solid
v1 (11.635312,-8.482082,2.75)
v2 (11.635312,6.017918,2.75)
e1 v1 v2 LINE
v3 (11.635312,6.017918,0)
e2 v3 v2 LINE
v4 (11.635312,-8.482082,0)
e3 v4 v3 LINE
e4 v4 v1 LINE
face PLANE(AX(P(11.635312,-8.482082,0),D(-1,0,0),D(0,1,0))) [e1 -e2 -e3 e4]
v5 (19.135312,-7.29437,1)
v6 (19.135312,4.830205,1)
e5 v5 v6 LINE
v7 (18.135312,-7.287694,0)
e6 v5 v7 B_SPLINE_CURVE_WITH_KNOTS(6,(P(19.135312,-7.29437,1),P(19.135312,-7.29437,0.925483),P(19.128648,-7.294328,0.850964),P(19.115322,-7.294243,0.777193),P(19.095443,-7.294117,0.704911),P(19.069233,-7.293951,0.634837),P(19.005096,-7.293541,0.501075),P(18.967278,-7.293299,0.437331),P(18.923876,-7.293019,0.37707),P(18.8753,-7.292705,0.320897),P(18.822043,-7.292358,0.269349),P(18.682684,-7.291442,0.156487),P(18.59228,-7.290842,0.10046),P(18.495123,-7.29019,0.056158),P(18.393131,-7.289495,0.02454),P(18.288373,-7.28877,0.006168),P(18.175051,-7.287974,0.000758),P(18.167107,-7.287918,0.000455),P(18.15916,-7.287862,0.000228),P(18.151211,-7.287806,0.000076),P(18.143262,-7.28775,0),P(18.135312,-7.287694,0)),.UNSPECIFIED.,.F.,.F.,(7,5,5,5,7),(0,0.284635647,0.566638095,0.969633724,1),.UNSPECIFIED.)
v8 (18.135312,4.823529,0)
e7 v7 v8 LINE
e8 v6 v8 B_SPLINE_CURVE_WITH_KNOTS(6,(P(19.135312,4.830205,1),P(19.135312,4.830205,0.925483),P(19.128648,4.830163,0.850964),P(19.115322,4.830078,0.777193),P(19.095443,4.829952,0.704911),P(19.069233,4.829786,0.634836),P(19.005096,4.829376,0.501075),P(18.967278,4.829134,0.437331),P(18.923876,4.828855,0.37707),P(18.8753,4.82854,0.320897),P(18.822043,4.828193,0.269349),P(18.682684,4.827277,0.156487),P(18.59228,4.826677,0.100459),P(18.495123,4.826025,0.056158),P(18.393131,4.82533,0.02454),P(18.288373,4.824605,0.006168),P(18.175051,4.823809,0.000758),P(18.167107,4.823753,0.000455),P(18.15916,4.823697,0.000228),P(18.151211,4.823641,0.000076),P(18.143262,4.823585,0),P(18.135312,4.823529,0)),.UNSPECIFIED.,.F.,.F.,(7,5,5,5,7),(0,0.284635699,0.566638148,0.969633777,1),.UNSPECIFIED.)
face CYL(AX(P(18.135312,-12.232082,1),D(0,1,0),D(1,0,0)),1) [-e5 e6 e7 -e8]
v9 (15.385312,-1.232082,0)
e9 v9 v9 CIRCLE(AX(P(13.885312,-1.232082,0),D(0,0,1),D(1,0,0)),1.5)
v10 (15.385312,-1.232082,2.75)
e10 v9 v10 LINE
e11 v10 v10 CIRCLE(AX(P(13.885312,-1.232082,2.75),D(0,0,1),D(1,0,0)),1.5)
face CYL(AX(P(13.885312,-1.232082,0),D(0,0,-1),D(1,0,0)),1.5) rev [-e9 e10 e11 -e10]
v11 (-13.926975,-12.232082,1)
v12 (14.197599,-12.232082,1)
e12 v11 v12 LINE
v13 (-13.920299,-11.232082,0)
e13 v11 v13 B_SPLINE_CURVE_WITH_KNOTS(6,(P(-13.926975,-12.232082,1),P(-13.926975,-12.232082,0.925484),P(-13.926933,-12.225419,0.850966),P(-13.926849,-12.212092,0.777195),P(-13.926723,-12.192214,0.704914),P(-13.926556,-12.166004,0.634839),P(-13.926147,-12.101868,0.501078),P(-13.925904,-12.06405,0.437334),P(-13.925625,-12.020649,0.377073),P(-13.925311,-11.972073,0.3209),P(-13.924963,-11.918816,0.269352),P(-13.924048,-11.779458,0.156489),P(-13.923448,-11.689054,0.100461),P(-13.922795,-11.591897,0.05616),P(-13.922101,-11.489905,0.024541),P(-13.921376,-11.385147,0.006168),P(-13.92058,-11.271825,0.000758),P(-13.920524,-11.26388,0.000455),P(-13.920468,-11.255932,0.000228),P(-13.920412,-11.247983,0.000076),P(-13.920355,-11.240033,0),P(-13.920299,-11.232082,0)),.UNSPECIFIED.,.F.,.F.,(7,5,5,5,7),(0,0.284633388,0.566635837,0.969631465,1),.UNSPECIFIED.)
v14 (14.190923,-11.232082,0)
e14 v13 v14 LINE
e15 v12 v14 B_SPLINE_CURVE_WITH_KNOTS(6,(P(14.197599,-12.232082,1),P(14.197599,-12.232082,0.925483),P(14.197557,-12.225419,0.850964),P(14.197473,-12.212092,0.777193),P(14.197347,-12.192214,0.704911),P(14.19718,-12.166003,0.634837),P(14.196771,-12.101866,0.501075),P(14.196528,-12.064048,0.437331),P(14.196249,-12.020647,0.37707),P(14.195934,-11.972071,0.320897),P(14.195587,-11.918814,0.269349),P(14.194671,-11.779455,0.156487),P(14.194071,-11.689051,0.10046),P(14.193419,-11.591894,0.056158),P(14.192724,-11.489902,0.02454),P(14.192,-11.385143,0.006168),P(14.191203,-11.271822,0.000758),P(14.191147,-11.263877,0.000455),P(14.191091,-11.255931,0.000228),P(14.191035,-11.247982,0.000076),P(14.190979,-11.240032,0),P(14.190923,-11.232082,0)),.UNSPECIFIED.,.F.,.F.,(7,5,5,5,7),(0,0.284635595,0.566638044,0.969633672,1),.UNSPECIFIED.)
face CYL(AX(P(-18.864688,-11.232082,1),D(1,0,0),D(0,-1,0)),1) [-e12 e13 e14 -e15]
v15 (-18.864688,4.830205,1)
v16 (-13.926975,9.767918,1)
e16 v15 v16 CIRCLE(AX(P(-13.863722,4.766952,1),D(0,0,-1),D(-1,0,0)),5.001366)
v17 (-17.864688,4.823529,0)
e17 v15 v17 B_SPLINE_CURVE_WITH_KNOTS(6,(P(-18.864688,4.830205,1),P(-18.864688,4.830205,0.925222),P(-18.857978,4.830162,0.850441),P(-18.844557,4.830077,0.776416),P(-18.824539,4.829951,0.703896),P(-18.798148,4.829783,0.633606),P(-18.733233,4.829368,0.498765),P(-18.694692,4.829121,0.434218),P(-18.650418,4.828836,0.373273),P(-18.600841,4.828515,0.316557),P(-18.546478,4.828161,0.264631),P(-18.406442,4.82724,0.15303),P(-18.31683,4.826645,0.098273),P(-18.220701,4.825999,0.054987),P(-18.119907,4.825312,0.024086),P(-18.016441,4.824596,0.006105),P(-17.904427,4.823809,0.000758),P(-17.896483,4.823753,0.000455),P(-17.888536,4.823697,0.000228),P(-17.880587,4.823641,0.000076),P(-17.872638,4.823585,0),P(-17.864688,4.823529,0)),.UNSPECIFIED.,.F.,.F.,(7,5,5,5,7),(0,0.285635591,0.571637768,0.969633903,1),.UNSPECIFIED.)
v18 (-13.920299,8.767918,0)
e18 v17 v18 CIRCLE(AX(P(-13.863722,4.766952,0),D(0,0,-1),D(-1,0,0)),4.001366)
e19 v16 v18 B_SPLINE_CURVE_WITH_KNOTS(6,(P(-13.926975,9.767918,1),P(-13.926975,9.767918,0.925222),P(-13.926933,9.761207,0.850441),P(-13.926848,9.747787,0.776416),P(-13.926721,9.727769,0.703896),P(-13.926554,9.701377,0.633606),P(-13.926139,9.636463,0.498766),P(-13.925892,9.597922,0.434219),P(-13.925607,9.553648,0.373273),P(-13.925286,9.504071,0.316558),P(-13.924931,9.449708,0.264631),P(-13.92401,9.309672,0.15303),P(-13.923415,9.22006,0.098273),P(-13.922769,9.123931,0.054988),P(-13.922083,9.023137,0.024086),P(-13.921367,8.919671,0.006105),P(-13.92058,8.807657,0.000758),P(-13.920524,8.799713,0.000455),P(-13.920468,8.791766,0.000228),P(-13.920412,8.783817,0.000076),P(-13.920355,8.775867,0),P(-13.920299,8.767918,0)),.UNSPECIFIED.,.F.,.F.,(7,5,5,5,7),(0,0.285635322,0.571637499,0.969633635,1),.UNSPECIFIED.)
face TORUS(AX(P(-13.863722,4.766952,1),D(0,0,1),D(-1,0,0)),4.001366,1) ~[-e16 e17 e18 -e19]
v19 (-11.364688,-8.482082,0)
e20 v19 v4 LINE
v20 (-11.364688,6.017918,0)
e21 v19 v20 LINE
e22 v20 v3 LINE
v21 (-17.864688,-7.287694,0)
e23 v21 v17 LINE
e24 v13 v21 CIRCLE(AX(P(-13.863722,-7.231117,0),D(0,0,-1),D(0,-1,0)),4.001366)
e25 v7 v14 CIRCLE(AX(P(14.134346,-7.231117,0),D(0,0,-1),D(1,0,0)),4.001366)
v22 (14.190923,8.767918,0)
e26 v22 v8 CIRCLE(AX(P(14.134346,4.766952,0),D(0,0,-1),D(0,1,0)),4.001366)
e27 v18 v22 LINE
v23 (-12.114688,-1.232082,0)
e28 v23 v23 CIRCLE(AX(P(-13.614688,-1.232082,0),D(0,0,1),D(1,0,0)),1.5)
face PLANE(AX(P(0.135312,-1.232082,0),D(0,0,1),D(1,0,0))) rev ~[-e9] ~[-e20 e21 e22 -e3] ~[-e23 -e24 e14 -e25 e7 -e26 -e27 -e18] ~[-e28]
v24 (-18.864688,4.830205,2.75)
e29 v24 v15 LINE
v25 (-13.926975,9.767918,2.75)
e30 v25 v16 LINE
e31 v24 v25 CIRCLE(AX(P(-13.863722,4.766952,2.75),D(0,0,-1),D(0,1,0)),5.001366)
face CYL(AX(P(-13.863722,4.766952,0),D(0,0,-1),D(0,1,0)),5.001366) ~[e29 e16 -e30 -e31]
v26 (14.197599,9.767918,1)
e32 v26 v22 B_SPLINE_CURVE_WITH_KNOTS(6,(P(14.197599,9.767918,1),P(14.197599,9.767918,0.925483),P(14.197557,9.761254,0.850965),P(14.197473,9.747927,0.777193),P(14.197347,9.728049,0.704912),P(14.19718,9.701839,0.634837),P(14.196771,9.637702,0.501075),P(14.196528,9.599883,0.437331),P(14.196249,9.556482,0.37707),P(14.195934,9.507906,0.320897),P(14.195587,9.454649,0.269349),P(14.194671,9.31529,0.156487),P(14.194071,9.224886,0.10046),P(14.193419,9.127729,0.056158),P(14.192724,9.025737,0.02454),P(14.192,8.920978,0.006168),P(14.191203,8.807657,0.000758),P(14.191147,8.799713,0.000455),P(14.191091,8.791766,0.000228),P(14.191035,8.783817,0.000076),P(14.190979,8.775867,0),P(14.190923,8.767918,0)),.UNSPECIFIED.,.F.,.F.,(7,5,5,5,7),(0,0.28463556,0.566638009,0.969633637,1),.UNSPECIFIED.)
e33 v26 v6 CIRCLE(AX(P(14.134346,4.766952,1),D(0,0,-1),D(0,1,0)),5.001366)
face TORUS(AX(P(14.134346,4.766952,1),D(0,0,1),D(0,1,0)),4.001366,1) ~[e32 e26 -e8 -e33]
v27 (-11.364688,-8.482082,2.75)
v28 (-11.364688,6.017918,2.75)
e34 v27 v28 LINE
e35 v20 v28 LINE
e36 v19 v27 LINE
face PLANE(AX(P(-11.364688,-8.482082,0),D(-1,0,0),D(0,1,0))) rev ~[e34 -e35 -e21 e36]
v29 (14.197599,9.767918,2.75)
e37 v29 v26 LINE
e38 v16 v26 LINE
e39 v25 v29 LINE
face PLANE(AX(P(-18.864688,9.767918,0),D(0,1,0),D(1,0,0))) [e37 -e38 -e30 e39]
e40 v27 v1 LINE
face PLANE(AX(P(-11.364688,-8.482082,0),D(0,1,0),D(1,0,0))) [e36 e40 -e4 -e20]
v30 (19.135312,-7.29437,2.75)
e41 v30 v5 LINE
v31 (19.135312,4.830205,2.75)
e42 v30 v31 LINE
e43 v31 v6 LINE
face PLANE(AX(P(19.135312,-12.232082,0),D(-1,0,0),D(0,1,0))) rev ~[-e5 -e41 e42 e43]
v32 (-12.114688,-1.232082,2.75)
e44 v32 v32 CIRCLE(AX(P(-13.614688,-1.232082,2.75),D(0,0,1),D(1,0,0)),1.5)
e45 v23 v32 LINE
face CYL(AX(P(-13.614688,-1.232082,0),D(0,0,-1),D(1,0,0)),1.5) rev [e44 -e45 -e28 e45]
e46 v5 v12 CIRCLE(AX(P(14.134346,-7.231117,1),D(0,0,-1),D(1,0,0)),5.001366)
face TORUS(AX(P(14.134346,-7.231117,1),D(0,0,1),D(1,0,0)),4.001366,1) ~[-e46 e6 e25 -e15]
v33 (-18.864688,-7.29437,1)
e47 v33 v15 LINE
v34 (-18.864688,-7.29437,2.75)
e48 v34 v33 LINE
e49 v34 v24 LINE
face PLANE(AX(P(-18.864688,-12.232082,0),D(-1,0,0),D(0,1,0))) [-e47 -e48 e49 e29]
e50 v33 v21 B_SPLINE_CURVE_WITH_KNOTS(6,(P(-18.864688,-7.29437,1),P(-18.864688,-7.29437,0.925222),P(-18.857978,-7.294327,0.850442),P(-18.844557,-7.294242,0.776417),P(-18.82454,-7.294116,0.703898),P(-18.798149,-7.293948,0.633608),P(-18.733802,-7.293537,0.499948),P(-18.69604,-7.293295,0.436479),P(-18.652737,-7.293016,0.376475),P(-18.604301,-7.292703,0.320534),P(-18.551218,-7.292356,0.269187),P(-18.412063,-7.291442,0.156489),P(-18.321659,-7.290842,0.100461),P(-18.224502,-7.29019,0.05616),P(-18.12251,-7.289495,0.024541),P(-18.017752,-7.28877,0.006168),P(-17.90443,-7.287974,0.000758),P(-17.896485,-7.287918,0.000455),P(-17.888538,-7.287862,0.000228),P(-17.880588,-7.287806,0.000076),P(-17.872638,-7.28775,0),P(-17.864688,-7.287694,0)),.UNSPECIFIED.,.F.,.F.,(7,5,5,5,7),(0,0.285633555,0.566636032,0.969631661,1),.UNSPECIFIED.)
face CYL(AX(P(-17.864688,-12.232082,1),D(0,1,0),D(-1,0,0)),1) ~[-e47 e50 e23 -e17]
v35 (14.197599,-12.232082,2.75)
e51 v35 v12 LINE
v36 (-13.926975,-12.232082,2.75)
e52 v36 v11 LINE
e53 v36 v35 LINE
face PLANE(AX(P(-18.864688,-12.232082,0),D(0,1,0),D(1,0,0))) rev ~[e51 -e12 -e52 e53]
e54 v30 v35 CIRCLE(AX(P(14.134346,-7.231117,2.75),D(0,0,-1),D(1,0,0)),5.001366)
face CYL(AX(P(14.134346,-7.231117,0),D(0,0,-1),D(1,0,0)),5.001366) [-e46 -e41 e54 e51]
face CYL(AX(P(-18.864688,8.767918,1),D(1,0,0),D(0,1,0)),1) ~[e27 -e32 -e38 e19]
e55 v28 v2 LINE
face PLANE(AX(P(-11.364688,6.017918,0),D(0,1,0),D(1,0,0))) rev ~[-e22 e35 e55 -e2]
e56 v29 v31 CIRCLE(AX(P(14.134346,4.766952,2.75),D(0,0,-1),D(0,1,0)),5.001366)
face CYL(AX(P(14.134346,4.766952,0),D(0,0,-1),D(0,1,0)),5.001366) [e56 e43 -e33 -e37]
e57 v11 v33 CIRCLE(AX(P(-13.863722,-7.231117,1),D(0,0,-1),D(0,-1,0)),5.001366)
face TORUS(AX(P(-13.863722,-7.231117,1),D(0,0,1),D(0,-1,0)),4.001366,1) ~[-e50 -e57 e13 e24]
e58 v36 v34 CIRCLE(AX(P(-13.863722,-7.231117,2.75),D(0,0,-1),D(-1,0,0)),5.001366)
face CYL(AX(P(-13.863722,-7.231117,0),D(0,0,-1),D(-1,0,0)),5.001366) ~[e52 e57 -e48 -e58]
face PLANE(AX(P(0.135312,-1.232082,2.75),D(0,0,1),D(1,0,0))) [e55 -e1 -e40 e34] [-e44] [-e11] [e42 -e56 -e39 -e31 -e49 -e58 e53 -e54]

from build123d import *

# Parameters (mm, degrees)
F0_W         = 38
F0_H         = 22
F0_R         = 1.5
F0_W_2       = 23
F0_H_2       = 14.5
F1_DEPTH     = 2.75
F2_R         = 1
F3_T3_ANGLE  = 90
F3_T6_ANGLE  = 90
F3_T9_ANGLE  = 90
F3_T12_ANGLE = 90
F3_T15_DEPTH = 15.2524142536
F3_T18_DEPTH = 15.2524142536
F3_T21_DEPTH = 15.2524142536
F3_T24_DEPTH = 15.2524142536


# Not quite as in the source:
# - a fillet or chamfer that OpenCascade refuses, or shapes differently, is made with other operations: its cross-section is extruded or revolved along the edge and cut away or added


with BuildPart() as f1:
    # F0 (on Top) → F1 (new body)
    with BuildSketch(Plane.XY):
        with Locations((0.1353118792, -1.2320824713)):
            Rectangle(F0_W, F0_H)
        with Locations((-13.6146881208, -1.2320824713)):
            Circle(F0_R, mode=Mode.SUBTRACT)
        with Locations((0.1353118792, -1.2320824713)):
            Rectangle(F0_W_2, F0_H_2, mode=Mode.SUBTRACT)
        with Locations((13.8853118792, -1.2320824713)):
            Circle(F0_R, mode=Mode.SUBTRACT)
    extrude(amount=F1_DEPTH)

    # F2
    f2_edges = [f1.edges().sort_by_distance(p)[0] for p in [
        (19.135312, -1.232082, 0),
        (0.135312, 9.767918, 0),
        (-18.864688, -1.232082, 0),
        (0.135312, -12.232082, 0),
    ]]
    fillet(f2_edges, radius=F2_R)

    # F3: fillet of radius 5 on 4 edges, made by hand


with BuildPart() as f3_tool1:
    # F3_s2 → F3_t3 (revolve)
    with BuildSketch(Plane.XZ.offset(-4.7669518433)):
        with BuildLine():
            ThreePointArc((-17.8650881208, 0), (-18.572194902, 0.2928932188), (-18.8650881208, 1))
            Line((-18.8650881208, 1), (-18.8650881208, 0))
            Line((-18.8650881208, 0), (-17.8650881208, 0))
        make_face()
    revolve(axis=Axis((-13.8637224354, 4.7669518433, 0), (0, 0, -1)), revolution_arc=F3_T3_ANGLE)


with BuildPart() as f3_tool4:
    # F3_s5 → F3_t6 (revolve)
    with BuildSketch(Plane.YZ.offset(-13.8637224354)):
        with BuildLine():
            ThreePointArc((-11.2324824713, 0), (-11.9395892524, 0.2928932188), (-12.2324824713, 1))
            Line((-12.2324824713, 1), (-12.2324824713, 0))
            Line((-12.2324824713, 0), (-11.2324824713, 0))
        make_face()
    revolve(axis=Axis((-13.8637224354, -7.2311167858, 0), (0, 0, -1)), revolution_arc=F3_T6_ANGLE)


with BuildPart() as f3_tool7:
    # F3_s8 → F3_t9 (revolve)
    with BuildSketch(Plane.XZ.offset(7.2311167858)):
        with BuildLine():
            ThreePointArc((18.1357118792, 0), (18.8428186604, 0.2928932188), (19.1357118792, 1))
            Line((19.1357118792, 1), (19.1357118792, 0))
            Line((19.1357118792, 0), (18.1357118792, 0))
        make_face()
    revolve(axis=Axis((14.1343461938, -7.2311167858, 0), (0, 0, -1)), revolution_arc=F3_T9_ANGLE)


with BuildPart() as f3_tool10:
    # F3_s11 → F3_t12 (revolve)
    with BuildSketch(Plane.YZ.offset(14.1343461938)):
        with BuildLine():
            ThreePointArc((8.7683175287, 0), (9.4754243099, 0.2928932188), (9.7683175287, 1))
            Line((9.7683175287, 1), (9.7683175287, 0))
            Line((9.7683175287, 0), (8.7683175287, 0))
        make_face()
    revolve(axis=Axis((14.1343461938, 4.7669518433, 0), (0, 0, -1)), revolution_arc=F3_T12_ANGLE)


with BuildPart() as f3_tool13:
    # F3_s14 → F3_t15 (new body)
    with BuildSketch(Plane.XY):
        with BuildLine():
            ThreePointArc((14.1343461938, 9.7683175287), (17.6708457852, 8.3034514347), (19.1357118792, 4.7669518433))
            Line((19.1357118792, 4.7669518433), (19.6358484478, 4.7669518433))
            ThreePointArc((19.6358484478, 4.7669518433), (19.6354484478, 7.267434686), (19.6354484478, 9.7679175287))
            Line((19.6354484478, 9.7679175287), (19.1353118792, 10.2680540973))
            ThreePointArc((19.1353118792, 10.2680540973), (16.6348290365, 10.2680540973), (14.1343461938, 10.2684540973))
            Line((14.1343461938, 10.2684540973), (14.1343461938, 9.7683175287))
        make_face()
    extrude(amount=F3_T15_DEPTH)


with BuildPart() as f3_tool16:
    # F3_s17 → F3_t18 (new body)
    with BuildSketch(Plane.XY):
        with BuildLine():
            ThreePointArc((19.1357118792, -7.2311167858), (17.6708457852, -10.7676163772), (14.1343461938, -12.2324824713))
            Line((14.1343461938, -12.2324824713), (14.1343461938, -12.7326190398))
            ThreePointArc((14.1343461938, -12.7326190398), (16.6348290365, -12.7322190398), (19.1353118792, -12.7322190398))
            Line((19.1353118792, -12.7322190398), (19.6354484478, -12.2320824713))
            ThreePointArc((19.6354484478, -12.2320824713), (19.6354484478, -9.7315996285), (19.6358484478, -7.2311167858))
            Line((19.6358484478, -7.2311167858), (19.1357118792, -7.2311167858))
        make_face()
    extrude(amount=F3_T18_DEPTH)


with BuildPart() as f3_tool19:
    # F3_s20 → F3_t21 (new body)
    with BuildSketch(Plane.XY):
        with BuildLine():
            ThreePointArc((-18.8650881208, -7.2311167858), (-17.4002220267, -10.7676163772), (-13.8637224354, -12.2324824713))
            Line((-13.8637224354, -12.2324824713), (-13.8637224354, -12.7326190398))
            ThreePointArc((-13.8637224354, -12.7326190398), (-16.3642052781, -12.7322190398), (-18.8646881208, -12.7322190398))
            Line((-18.8646881208, -12.7322190398), (-19.3648246893, -12.2320824713))
            ThreePointArc((-19.3648246893, -12.2320824713), (-19.3648246893, -9.7315996285), (-19.3652246893, -7.2311167858))
            Line((-19.3652246893, -7.2311167858), (-18.8650881208, -7.2311167858))
        make_face()
    extrude(amount=F3_T21_DEPTH)


with BuildPart() as f3_tool22:
    # F3_s23 → F3_t24 (new body)
    with BuildSketch(Plane.XY):
        with BuildLine():
            ThreePointArc((-13.8637224354, 9.7683175287), (-17.4002220267, 8.3034514347), (-18.8650881208, 4.7669518433))
            Line((-18.8650881208, 4.7669518433), (-19.3652246893, 4.7669518433))
            ThreePointArc((-19.3652246893, 4.7669518433), (-19.3648246893, 7.267434686), (-19.3648246893, 9.7679175287))
            Line((-19.3648246893, 9.7679175287), (-18.8646881208, 10.2680540973))
            ThreePointArc((-18.8646881208, 10.2680540973), (-16.3642052781, 10.2680540973), (-13.8637224354, 10.2684540973))
            Line((-13.8637224354, 10.2684540973), (-13.8637224354, 9.7683175287))
        make_face()
    extrude(amount=F3_T24_DEPTH)


with BuildPart() as f1_1:
    add(f1.part)

    # F3_t25: cut F3_tool1, F3_tool4, F3_tool7, F3_tool10, F3_tool13, F3_tool16, F3_tool19, F3_tool22
    add([f3_tool1.part, f3_tool4.part, f3_tool7.part, f3_tool10.part, f3_tool13.part, f3_tool16.part, f3_tool19.part, f3_tool22.part], mode=Mode.SUBTRACT)


solid = f1_1.part
